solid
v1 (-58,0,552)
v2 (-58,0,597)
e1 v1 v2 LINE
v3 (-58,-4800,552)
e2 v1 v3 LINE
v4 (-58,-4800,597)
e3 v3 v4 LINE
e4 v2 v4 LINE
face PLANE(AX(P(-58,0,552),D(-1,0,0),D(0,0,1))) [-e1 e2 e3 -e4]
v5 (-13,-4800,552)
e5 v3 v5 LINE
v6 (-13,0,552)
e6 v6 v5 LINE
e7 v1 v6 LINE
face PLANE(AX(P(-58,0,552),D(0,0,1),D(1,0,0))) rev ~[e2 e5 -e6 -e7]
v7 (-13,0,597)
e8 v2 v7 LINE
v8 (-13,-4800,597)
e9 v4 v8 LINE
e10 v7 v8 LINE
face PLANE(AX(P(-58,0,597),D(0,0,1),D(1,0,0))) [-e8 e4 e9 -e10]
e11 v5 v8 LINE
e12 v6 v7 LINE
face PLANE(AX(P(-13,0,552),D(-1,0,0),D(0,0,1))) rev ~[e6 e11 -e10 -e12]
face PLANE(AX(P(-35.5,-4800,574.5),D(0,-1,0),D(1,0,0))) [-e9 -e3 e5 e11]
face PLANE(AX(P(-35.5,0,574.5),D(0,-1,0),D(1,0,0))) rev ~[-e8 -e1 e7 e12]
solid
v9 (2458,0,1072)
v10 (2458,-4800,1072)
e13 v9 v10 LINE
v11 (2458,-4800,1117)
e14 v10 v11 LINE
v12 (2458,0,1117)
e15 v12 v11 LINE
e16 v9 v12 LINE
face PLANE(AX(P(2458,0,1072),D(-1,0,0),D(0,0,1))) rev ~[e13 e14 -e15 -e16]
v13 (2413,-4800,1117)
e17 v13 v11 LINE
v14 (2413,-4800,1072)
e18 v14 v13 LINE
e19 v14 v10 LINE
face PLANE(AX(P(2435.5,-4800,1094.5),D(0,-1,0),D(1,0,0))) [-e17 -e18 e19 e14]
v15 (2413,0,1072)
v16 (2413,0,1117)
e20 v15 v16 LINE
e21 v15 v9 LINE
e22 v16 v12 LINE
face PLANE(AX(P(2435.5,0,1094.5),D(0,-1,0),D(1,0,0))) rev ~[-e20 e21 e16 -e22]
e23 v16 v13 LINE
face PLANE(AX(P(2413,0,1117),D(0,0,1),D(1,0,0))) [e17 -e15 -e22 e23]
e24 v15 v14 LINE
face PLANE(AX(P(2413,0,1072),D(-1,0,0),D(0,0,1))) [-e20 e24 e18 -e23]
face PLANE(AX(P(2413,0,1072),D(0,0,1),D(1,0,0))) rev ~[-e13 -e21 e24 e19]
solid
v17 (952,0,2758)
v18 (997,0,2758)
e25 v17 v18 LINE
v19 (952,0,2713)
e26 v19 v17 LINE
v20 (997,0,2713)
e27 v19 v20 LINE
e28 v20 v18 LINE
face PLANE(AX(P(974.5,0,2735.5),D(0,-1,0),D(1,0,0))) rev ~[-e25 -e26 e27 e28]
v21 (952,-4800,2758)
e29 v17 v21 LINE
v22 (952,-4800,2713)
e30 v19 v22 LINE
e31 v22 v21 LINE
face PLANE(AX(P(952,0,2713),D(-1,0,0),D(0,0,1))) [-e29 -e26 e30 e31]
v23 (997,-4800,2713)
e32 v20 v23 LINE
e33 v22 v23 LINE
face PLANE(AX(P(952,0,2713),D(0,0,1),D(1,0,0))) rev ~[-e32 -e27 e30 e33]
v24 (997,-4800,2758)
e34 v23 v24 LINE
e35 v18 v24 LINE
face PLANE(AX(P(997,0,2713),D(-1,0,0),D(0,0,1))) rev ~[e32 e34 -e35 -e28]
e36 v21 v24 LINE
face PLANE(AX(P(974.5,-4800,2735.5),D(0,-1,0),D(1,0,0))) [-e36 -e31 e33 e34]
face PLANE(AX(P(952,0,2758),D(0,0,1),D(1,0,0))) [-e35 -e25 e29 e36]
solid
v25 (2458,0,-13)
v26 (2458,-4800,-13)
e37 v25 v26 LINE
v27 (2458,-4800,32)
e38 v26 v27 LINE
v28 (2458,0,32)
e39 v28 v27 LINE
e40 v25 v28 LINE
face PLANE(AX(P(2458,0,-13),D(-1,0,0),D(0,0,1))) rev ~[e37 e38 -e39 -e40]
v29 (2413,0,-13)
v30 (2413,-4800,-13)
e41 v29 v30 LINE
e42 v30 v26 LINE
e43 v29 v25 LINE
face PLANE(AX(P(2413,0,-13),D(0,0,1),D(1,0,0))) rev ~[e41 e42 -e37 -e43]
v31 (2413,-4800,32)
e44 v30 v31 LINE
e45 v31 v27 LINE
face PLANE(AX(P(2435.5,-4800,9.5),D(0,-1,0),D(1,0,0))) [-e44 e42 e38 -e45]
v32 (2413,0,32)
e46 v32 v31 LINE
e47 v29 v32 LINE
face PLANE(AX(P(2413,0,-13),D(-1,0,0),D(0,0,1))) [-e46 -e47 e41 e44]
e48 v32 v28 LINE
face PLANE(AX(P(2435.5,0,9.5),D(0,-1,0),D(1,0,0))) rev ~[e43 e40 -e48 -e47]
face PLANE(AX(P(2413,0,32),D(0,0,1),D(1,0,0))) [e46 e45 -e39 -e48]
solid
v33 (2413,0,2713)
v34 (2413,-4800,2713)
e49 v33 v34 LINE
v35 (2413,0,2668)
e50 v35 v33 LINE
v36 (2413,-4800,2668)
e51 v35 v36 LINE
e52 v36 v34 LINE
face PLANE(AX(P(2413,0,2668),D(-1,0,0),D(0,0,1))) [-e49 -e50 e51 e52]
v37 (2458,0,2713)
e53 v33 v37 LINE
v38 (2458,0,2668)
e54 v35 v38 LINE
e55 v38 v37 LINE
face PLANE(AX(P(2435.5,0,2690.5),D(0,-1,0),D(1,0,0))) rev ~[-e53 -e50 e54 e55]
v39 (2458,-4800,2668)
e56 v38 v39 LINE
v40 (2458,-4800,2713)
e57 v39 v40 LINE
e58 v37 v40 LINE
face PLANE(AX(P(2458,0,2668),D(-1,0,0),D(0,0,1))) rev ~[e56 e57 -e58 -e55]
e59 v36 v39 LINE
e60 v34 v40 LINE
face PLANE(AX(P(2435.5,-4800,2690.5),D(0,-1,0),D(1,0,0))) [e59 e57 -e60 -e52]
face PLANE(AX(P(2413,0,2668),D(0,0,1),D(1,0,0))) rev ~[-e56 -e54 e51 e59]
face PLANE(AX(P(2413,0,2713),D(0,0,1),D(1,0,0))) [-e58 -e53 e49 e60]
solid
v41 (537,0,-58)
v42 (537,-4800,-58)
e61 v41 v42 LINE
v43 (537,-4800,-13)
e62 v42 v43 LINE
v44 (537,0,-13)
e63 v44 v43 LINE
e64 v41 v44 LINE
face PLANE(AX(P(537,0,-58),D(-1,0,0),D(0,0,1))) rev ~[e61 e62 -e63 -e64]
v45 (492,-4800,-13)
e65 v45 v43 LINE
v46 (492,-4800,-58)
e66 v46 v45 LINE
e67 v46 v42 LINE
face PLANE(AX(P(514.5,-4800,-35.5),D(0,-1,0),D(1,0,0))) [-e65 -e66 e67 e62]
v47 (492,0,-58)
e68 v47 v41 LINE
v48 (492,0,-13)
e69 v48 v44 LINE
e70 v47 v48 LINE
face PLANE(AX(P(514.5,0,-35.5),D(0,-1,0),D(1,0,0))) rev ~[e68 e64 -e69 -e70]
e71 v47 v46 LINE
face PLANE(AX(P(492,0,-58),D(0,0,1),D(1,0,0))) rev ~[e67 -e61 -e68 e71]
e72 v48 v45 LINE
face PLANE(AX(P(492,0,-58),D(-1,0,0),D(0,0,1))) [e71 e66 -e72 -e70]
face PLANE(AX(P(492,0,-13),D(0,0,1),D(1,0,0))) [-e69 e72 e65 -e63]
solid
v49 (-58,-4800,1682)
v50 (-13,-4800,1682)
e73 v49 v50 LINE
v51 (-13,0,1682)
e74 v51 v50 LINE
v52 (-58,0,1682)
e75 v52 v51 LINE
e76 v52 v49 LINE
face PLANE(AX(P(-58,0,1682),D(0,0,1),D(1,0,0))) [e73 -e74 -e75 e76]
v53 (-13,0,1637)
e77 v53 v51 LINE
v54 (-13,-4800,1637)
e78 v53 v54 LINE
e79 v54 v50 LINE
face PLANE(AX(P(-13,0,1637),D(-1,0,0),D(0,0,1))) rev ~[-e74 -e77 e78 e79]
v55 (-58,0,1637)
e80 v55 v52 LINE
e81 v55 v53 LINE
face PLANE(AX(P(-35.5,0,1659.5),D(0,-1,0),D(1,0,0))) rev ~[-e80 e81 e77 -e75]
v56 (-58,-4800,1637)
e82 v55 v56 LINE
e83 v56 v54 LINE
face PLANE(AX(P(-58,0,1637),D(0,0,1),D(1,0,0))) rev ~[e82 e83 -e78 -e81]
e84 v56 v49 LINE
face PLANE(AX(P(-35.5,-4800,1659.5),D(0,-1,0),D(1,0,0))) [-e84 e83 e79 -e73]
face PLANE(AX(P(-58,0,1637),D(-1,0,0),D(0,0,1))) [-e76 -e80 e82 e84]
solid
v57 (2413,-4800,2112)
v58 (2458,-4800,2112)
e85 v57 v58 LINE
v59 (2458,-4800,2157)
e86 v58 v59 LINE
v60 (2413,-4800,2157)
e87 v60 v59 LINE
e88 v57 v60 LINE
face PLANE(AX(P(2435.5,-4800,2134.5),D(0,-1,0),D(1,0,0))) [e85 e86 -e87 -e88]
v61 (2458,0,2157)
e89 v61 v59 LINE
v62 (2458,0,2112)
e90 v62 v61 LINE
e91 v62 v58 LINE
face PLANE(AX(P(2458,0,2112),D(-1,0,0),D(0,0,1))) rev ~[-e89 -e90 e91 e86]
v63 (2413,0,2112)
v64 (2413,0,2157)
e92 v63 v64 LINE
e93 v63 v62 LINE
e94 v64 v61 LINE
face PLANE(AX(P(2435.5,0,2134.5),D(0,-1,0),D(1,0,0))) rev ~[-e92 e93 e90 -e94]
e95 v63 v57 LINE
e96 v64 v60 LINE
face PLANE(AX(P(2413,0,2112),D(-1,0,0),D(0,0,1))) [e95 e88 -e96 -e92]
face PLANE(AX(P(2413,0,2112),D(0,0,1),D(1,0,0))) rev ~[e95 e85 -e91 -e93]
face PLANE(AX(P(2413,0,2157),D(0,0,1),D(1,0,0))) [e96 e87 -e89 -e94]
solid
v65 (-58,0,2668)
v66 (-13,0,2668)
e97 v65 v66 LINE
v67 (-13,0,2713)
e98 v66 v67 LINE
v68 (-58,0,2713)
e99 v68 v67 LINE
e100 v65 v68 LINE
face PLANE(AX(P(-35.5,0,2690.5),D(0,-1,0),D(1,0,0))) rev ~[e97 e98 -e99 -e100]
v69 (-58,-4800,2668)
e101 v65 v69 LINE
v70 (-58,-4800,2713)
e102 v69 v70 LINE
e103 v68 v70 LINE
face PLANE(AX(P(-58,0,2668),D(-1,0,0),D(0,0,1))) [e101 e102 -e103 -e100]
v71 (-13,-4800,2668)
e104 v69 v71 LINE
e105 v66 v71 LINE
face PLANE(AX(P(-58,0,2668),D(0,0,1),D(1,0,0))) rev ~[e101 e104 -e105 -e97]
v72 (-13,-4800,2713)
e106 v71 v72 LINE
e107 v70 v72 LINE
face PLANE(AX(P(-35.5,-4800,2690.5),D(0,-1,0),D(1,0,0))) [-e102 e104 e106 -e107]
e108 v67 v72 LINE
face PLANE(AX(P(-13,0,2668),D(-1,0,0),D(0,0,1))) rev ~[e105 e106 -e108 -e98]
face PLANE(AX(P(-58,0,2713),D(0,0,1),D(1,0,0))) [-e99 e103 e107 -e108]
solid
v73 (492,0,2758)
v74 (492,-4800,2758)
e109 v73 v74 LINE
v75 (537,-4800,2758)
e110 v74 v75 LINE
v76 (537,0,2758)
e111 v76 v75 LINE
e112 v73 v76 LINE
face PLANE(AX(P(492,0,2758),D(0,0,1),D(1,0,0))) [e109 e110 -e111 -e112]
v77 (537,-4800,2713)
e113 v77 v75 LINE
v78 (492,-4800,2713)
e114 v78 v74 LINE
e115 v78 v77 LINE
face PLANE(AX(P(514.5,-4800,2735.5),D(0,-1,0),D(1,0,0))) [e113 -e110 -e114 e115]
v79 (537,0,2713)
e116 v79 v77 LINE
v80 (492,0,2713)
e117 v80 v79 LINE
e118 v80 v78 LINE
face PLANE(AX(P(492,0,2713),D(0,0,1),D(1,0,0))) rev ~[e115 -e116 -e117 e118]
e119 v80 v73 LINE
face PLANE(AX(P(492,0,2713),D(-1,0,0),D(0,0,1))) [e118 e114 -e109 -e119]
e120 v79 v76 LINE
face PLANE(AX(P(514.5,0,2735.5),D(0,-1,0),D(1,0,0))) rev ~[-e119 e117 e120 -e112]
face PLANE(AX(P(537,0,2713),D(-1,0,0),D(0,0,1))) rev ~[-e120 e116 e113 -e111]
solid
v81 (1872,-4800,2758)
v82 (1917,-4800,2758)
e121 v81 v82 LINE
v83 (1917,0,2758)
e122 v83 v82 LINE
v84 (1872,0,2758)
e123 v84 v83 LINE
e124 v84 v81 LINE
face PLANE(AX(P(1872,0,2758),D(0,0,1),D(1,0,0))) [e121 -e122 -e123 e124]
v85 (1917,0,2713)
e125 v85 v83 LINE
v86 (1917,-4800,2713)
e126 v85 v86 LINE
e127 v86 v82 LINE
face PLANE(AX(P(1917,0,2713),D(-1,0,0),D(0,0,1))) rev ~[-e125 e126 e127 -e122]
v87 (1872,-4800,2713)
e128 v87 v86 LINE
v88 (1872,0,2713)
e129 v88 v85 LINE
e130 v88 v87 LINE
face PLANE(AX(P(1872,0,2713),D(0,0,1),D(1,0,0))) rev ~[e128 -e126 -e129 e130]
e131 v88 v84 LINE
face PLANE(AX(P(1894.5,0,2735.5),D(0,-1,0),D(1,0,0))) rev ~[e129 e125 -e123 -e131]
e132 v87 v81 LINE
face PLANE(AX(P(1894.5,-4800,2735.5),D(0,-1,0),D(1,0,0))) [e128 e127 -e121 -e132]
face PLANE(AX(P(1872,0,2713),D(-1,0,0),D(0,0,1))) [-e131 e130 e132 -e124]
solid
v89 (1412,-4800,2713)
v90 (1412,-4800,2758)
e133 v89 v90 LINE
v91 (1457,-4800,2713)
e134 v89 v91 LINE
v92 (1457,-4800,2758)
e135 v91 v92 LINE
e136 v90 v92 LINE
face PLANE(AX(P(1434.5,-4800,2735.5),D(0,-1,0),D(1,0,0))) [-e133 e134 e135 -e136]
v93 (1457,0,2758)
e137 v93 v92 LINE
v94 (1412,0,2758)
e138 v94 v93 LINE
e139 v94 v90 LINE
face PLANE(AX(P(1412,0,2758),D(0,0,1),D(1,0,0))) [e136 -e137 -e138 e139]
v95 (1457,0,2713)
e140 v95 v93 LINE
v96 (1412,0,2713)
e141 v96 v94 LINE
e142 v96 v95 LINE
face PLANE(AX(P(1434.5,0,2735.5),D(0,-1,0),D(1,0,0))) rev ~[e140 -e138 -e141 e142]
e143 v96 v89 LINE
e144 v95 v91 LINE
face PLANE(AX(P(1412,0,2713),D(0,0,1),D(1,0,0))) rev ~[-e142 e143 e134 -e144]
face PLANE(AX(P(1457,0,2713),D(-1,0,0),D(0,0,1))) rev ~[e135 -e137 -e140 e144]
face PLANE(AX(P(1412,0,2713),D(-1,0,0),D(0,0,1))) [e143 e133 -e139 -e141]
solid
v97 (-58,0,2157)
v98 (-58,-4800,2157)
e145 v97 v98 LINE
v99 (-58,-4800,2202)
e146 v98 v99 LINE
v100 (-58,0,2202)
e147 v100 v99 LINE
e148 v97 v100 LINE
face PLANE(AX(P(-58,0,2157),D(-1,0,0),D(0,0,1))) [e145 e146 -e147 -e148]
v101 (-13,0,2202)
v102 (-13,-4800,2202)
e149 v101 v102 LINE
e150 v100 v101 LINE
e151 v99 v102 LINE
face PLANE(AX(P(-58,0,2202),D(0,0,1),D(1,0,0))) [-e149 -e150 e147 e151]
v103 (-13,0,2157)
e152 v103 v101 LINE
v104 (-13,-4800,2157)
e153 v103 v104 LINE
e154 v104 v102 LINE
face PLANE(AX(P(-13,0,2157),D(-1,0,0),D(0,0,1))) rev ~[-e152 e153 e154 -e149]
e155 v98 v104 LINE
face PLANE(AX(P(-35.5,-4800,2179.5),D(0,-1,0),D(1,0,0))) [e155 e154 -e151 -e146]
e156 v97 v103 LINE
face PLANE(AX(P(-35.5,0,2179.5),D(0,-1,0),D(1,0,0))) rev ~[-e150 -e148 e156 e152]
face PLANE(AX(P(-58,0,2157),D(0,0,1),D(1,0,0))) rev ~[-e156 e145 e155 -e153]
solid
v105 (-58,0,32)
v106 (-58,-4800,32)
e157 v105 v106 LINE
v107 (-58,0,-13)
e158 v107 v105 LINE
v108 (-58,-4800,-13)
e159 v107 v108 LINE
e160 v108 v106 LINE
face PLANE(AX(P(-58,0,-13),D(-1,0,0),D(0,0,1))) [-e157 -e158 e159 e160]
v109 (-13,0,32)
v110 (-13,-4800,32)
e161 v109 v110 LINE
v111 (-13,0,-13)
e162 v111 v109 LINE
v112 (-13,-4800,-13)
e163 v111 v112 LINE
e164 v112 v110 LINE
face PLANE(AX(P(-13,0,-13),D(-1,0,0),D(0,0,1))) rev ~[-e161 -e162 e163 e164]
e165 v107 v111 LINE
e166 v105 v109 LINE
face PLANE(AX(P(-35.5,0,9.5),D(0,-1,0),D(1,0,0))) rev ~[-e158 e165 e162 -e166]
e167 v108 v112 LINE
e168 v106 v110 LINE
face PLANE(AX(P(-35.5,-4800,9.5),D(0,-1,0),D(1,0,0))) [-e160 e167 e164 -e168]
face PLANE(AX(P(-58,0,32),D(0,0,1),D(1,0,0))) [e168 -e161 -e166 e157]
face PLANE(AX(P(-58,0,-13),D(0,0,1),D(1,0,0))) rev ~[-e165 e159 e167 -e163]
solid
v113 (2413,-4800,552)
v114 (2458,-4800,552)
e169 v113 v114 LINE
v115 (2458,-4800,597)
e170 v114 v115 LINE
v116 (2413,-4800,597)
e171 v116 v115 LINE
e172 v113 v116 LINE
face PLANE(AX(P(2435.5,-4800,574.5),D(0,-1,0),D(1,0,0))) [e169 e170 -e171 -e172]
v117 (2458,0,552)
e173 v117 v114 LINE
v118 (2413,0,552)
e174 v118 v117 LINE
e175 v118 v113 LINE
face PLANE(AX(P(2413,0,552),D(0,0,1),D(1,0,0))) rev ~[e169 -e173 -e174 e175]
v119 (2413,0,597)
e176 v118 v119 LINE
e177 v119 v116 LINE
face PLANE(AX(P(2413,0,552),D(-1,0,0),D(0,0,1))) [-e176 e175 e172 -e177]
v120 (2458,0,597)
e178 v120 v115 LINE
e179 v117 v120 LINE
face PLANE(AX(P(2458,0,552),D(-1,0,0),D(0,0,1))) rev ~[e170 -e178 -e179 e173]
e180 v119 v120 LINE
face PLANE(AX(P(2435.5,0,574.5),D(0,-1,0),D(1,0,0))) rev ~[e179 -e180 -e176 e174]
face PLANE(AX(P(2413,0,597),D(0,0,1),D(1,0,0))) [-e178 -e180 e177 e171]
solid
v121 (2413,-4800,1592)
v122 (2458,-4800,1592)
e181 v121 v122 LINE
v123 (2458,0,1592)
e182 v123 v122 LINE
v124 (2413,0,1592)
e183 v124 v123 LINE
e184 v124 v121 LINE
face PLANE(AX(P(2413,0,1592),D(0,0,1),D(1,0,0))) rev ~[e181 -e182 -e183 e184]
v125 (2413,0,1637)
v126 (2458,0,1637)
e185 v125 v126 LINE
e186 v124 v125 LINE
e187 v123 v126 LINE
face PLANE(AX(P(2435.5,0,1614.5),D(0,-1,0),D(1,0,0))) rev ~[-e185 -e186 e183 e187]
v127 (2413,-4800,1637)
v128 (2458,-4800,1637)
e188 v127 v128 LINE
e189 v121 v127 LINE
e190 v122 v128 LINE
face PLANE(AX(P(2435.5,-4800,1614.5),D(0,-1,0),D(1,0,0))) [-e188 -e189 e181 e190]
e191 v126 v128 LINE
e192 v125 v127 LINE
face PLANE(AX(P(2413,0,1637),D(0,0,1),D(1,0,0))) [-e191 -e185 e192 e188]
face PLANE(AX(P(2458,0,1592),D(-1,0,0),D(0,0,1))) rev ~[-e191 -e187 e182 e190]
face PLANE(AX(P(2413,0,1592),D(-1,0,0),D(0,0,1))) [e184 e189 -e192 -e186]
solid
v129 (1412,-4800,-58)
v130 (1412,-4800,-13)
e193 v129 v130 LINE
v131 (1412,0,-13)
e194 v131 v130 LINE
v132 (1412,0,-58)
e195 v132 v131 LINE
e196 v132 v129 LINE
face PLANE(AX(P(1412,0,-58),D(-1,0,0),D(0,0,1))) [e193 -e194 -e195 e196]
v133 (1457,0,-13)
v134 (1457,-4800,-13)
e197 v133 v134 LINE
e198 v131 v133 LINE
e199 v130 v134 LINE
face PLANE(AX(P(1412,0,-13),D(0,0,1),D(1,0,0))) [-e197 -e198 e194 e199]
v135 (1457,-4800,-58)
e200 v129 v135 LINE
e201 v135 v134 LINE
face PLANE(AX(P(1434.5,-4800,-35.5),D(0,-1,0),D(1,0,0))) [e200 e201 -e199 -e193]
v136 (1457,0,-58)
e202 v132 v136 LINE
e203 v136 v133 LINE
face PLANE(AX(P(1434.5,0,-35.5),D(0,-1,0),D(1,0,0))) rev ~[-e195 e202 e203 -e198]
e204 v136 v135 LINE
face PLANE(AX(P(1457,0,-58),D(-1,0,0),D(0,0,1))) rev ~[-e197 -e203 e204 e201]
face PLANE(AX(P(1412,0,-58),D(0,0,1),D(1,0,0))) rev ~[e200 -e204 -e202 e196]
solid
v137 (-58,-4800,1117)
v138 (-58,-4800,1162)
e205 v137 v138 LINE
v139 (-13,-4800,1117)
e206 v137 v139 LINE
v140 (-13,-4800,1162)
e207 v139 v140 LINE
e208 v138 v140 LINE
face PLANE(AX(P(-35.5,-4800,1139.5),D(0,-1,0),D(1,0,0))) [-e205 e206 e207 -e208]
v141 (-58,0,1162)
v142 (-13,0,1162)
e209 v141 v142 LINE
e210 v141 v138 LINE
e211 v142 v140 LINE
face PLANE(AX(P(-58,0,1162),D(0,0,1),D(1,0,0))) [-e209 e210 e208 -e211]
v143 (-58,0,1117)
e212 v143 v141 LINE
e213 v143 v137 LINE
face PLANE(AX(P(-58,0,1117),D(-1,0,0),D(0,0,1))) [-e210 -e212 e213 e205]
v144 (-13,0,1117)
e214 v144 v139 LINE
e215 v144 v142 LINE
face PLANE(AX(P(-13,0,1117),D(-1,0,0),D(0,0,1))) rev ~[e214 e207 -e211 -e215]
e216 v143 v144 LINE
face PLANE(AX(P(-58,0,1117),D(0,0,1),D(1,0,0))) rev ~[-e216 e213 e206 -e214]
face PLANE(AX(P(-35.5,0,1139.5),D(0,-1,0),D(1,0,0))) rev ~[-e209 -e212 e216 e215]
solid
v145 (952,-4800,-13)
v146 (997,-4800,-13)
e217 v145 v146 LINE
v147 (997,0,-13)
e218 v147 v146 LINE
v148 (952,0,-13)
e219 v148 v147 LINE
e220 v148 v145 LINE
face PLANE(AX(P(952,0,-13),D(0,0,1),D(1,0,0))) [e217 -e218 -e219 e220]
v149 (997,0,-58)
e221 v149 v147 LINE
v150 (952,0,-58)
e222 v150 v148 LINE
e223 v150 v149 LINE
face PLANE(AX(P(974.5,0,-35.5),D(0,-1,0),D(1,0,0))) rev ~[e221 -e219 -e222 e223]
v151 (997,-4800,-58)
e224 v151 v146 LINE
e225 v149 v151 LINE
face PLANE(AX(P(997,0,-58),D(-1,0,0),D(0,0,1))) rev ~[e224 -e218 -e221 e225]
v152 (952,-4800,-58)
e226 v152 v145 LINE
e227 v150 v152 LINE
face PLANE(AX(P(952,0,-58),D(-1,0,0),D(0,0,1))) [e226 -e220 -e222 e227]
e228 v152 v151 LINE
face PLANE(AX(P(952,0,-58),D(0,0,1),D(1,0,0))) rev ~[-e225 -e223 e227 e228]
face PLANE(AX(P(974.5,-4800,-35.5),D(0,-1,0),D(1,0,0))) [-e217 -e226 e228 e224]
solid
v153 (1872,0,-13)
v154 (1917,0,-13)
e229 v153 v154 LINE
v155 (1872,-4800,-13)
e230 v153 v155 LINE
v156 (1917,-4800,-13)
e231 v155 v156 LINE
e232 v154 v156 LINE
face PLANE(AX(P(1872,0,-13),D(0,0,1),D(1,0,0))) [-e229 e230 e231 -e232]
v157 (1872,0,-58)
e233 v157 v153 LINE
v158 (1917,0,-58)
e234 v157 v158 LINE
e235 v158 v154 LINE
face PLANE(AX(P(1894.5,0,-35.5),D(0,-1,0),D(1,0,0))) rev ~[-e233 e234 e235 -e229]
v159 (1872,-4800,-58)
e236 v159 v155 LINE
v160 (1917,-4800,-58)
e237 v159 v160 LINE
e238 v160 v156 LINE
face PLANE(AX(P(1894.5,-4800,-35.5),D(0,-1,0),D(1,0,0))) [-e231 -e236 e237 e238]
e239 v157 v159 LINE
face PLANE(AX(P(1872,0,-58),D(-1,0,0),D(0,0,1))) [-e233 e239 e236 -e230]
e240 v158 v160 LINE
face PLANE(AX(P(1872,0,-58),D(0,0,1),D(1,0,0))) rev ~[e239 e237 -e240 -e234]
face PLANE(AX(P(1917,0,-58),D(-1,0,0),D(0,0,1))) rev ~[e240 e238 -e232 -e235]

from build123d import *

# Parameters (mm, degrees)
F0_W     = 45
F0_H     = 45
F2_DEPTH = 4800


# Not quite as in the source:
# - a feature of the source that left no trace in its solid (it failed there, or was rolled back) is left out


with BuildPart() as f2:
    # F0 (on Front) → F2 (new body)
    with BuildSketch(Plane.XZ):
        with Locations((-35.5, 2690.5)):
            Rectangle(F0_W, F0_H)
    extrude(amount=F2_DEPTH)


with BuildPart() as f2b:
    # F0 (on Front) → F2, piece 2 (new body)
    with BuildSketch(Plane.XZ):
        with Locations((2435.5, 2690.5)):
            Rectangle(F0_W, F0_H)
    extrude(amount=F2_DEPTH)


with BuildPart() as f2c:
    # F0 (on Front) → F2, piece 3 (new body)
    with BuildSketch(Plane.XZ):
        with Locations((514.5, 2735.5)):
            Rectangle(F0_W, F0_H)
    extrude(amount=F2_DEPTH)


with BuildPart() as f2d:
    # F0 (on Front) → F2, piece 4 (new body)
    with BuildSketch(Plane.XZ):
        with Locations((974.5, 2735.5)):
            Rectangle(F0_W, F0_H)
    extrude(amount=F2_DEPTH)


with BuildPart() as f2e:
    # F0 (on Front) → F2, piece 5 (new body)
    with BuildSketch(Plane.XZ):
        with Locations((1434.5, 2735.5)):
            Rectangle(F0_W, F0_H)
    extrude(amount=F2_DEPTH)


with BuildPart() as f2f:
    # F0 (on Front) → F2, piece 6 (new body)
    with BuildSketch(Plane.XZ):
        with Locations((1894.5, 2735.5)):
            Rectangle(F0_W, F0_H)
    extrude(amount=F2_DEPTH)


with BuildPart() as f2g:
    # F0 (on Front) → F2, piece 7 (new body)
    with BuildSketch(Plane.XZ):
        with Locations((-35.5, 2179.5)):
            Rectangle(F0_W, F0_H)
    extrude(amount=F2_DEPTH)


with BuildPart() as f2h:
    # F0 (on Front) → F2, piece 8 (new body)
    with BuildSketch(Plane.XZ):
        with Locations((-35.5, 1659.5)):
            Rectangle(F0_W, F0_H)
    extrude(amount=F2_DEPTH)


with BuildPart() as f2i:
    # F0 (on Front) → F2, piece 9 (new body)
    with BuildSketch(Plane.XZ):
        with Locations((-35.5, 1139.5)):
            Rectangle(F0_W, F0_H)
    extrude(amount=F2_DEPTH)


with BuildPart() as f2j:
    # F0 (on Front) → F2, piece 10 (new body)
    with BuildSketch(Plane.XZ):
        with Locations((-35.5, 574.5)):
            Rectangle(F0_W, F0_H)
    extrude(amount=F2_DEPTH)


with BuildPart() as f2k:
    # F0 (on Front) → F2, piece 11 (new body)
    with BuildSketch(Plane.XZ):
        with Locations((-35.5, 9.5)):
            Rectangle(F0_W, F0_H)
    extrude(amount=F2_DEPTH)


with BuildPart() as f2l:
    # F0 (on Front) → F2, piece 12 (new body)
    with BuildSketch(Plane.XZ):
        with Locations((2435.5, 9.5)):
            Rectangle(F0_W, F0_H)
    extrude(amount=F2_DEPTH)


with BuildPart() as f2m:
    # F0 (on Front) → F2, piece 13 (new body)
    with BuildSketch(Plane.XZ):
        with Locations((2435.5, 574.5)):
            Rectangle(F0_W, F0_H)
    extrude(amount=F2_DEPTH)


with BuildPart() as f2n:
    # F0 (on Front) → F2, piece 14 (new body)
    with BuildSketch(Plane.XZ):
        with Locations((2435.5, 1094.5)):
            Rectangle(F0_W, F0_H)
    extrude(amount=F2_DEPTH)


with BuildPart() as f2o:
    # F0 (on Front) → F2, piece 15 (new body)
    with BuildSketch(Plane.XZ):
        with Locations((2435.5, 1614.5)):
            Rectangle(F0_W, F0_H)
    extrude(amount=F2_DEPTH)


with BuildPart() as f2p:
    # F0 (on Front) → F2, piece 16 (new body)
    with BuildSketch(Plane.XZ):
        with Locations((2435.5, 2134.5)):
            Rectangle(F0_W, F0_H)
    extrude(amount=F2_DEPTH)


with BuildPart() as f2q:
    # F0 (on Front) → F2, piece 17 (new body)
    with BuildSketch(Plane.XZ):
        with Locations((514.5, -35.5)):
            Rectangle(F0_W, F0_H)
    extrude(amount=F2_DEPTH)


with BuildPart() as f2r:
    # F0 (on Front) → F2, piece 18 (new body)
    with BuildSketch(Plane.XZ):
        with Locations((974.5, -35.5)):
            Rectangle(F0_W, F0_H)
    extrude(amount=F2_DEPTH)


with BuildPart() as f2s:
    # F0 (on Front) → F2, piece 19 (new body)
    with BuildSketch(Plane.XZ):
        with Locations((1434.5, -35.5)):
            Rectangle(F0_W, F0_H)
    extrude(amount=F2_DEPTH)


with BuildPart() as f2t:
    # F0 (on Front) → F2, piece 20 (new body)
    with BuildSketch(Plane.XZ):
        with Locations((1894.5, -35.5)):
            Rectangle(F0_W, F0_H)
    extrude(amount=F2_DEPTH)


solid = Compound([f2.part, f2b.part, f2c.part, f2d.part, f2e.part, f2f.part, f2g.part, f2h.part, f2i.part, f2j.part, f2k.part, f2l.part, f2m.part, f2n.part, f2o.part, f2p.part, f2q.part, f2r.part, f2s.part, f2t.part])
